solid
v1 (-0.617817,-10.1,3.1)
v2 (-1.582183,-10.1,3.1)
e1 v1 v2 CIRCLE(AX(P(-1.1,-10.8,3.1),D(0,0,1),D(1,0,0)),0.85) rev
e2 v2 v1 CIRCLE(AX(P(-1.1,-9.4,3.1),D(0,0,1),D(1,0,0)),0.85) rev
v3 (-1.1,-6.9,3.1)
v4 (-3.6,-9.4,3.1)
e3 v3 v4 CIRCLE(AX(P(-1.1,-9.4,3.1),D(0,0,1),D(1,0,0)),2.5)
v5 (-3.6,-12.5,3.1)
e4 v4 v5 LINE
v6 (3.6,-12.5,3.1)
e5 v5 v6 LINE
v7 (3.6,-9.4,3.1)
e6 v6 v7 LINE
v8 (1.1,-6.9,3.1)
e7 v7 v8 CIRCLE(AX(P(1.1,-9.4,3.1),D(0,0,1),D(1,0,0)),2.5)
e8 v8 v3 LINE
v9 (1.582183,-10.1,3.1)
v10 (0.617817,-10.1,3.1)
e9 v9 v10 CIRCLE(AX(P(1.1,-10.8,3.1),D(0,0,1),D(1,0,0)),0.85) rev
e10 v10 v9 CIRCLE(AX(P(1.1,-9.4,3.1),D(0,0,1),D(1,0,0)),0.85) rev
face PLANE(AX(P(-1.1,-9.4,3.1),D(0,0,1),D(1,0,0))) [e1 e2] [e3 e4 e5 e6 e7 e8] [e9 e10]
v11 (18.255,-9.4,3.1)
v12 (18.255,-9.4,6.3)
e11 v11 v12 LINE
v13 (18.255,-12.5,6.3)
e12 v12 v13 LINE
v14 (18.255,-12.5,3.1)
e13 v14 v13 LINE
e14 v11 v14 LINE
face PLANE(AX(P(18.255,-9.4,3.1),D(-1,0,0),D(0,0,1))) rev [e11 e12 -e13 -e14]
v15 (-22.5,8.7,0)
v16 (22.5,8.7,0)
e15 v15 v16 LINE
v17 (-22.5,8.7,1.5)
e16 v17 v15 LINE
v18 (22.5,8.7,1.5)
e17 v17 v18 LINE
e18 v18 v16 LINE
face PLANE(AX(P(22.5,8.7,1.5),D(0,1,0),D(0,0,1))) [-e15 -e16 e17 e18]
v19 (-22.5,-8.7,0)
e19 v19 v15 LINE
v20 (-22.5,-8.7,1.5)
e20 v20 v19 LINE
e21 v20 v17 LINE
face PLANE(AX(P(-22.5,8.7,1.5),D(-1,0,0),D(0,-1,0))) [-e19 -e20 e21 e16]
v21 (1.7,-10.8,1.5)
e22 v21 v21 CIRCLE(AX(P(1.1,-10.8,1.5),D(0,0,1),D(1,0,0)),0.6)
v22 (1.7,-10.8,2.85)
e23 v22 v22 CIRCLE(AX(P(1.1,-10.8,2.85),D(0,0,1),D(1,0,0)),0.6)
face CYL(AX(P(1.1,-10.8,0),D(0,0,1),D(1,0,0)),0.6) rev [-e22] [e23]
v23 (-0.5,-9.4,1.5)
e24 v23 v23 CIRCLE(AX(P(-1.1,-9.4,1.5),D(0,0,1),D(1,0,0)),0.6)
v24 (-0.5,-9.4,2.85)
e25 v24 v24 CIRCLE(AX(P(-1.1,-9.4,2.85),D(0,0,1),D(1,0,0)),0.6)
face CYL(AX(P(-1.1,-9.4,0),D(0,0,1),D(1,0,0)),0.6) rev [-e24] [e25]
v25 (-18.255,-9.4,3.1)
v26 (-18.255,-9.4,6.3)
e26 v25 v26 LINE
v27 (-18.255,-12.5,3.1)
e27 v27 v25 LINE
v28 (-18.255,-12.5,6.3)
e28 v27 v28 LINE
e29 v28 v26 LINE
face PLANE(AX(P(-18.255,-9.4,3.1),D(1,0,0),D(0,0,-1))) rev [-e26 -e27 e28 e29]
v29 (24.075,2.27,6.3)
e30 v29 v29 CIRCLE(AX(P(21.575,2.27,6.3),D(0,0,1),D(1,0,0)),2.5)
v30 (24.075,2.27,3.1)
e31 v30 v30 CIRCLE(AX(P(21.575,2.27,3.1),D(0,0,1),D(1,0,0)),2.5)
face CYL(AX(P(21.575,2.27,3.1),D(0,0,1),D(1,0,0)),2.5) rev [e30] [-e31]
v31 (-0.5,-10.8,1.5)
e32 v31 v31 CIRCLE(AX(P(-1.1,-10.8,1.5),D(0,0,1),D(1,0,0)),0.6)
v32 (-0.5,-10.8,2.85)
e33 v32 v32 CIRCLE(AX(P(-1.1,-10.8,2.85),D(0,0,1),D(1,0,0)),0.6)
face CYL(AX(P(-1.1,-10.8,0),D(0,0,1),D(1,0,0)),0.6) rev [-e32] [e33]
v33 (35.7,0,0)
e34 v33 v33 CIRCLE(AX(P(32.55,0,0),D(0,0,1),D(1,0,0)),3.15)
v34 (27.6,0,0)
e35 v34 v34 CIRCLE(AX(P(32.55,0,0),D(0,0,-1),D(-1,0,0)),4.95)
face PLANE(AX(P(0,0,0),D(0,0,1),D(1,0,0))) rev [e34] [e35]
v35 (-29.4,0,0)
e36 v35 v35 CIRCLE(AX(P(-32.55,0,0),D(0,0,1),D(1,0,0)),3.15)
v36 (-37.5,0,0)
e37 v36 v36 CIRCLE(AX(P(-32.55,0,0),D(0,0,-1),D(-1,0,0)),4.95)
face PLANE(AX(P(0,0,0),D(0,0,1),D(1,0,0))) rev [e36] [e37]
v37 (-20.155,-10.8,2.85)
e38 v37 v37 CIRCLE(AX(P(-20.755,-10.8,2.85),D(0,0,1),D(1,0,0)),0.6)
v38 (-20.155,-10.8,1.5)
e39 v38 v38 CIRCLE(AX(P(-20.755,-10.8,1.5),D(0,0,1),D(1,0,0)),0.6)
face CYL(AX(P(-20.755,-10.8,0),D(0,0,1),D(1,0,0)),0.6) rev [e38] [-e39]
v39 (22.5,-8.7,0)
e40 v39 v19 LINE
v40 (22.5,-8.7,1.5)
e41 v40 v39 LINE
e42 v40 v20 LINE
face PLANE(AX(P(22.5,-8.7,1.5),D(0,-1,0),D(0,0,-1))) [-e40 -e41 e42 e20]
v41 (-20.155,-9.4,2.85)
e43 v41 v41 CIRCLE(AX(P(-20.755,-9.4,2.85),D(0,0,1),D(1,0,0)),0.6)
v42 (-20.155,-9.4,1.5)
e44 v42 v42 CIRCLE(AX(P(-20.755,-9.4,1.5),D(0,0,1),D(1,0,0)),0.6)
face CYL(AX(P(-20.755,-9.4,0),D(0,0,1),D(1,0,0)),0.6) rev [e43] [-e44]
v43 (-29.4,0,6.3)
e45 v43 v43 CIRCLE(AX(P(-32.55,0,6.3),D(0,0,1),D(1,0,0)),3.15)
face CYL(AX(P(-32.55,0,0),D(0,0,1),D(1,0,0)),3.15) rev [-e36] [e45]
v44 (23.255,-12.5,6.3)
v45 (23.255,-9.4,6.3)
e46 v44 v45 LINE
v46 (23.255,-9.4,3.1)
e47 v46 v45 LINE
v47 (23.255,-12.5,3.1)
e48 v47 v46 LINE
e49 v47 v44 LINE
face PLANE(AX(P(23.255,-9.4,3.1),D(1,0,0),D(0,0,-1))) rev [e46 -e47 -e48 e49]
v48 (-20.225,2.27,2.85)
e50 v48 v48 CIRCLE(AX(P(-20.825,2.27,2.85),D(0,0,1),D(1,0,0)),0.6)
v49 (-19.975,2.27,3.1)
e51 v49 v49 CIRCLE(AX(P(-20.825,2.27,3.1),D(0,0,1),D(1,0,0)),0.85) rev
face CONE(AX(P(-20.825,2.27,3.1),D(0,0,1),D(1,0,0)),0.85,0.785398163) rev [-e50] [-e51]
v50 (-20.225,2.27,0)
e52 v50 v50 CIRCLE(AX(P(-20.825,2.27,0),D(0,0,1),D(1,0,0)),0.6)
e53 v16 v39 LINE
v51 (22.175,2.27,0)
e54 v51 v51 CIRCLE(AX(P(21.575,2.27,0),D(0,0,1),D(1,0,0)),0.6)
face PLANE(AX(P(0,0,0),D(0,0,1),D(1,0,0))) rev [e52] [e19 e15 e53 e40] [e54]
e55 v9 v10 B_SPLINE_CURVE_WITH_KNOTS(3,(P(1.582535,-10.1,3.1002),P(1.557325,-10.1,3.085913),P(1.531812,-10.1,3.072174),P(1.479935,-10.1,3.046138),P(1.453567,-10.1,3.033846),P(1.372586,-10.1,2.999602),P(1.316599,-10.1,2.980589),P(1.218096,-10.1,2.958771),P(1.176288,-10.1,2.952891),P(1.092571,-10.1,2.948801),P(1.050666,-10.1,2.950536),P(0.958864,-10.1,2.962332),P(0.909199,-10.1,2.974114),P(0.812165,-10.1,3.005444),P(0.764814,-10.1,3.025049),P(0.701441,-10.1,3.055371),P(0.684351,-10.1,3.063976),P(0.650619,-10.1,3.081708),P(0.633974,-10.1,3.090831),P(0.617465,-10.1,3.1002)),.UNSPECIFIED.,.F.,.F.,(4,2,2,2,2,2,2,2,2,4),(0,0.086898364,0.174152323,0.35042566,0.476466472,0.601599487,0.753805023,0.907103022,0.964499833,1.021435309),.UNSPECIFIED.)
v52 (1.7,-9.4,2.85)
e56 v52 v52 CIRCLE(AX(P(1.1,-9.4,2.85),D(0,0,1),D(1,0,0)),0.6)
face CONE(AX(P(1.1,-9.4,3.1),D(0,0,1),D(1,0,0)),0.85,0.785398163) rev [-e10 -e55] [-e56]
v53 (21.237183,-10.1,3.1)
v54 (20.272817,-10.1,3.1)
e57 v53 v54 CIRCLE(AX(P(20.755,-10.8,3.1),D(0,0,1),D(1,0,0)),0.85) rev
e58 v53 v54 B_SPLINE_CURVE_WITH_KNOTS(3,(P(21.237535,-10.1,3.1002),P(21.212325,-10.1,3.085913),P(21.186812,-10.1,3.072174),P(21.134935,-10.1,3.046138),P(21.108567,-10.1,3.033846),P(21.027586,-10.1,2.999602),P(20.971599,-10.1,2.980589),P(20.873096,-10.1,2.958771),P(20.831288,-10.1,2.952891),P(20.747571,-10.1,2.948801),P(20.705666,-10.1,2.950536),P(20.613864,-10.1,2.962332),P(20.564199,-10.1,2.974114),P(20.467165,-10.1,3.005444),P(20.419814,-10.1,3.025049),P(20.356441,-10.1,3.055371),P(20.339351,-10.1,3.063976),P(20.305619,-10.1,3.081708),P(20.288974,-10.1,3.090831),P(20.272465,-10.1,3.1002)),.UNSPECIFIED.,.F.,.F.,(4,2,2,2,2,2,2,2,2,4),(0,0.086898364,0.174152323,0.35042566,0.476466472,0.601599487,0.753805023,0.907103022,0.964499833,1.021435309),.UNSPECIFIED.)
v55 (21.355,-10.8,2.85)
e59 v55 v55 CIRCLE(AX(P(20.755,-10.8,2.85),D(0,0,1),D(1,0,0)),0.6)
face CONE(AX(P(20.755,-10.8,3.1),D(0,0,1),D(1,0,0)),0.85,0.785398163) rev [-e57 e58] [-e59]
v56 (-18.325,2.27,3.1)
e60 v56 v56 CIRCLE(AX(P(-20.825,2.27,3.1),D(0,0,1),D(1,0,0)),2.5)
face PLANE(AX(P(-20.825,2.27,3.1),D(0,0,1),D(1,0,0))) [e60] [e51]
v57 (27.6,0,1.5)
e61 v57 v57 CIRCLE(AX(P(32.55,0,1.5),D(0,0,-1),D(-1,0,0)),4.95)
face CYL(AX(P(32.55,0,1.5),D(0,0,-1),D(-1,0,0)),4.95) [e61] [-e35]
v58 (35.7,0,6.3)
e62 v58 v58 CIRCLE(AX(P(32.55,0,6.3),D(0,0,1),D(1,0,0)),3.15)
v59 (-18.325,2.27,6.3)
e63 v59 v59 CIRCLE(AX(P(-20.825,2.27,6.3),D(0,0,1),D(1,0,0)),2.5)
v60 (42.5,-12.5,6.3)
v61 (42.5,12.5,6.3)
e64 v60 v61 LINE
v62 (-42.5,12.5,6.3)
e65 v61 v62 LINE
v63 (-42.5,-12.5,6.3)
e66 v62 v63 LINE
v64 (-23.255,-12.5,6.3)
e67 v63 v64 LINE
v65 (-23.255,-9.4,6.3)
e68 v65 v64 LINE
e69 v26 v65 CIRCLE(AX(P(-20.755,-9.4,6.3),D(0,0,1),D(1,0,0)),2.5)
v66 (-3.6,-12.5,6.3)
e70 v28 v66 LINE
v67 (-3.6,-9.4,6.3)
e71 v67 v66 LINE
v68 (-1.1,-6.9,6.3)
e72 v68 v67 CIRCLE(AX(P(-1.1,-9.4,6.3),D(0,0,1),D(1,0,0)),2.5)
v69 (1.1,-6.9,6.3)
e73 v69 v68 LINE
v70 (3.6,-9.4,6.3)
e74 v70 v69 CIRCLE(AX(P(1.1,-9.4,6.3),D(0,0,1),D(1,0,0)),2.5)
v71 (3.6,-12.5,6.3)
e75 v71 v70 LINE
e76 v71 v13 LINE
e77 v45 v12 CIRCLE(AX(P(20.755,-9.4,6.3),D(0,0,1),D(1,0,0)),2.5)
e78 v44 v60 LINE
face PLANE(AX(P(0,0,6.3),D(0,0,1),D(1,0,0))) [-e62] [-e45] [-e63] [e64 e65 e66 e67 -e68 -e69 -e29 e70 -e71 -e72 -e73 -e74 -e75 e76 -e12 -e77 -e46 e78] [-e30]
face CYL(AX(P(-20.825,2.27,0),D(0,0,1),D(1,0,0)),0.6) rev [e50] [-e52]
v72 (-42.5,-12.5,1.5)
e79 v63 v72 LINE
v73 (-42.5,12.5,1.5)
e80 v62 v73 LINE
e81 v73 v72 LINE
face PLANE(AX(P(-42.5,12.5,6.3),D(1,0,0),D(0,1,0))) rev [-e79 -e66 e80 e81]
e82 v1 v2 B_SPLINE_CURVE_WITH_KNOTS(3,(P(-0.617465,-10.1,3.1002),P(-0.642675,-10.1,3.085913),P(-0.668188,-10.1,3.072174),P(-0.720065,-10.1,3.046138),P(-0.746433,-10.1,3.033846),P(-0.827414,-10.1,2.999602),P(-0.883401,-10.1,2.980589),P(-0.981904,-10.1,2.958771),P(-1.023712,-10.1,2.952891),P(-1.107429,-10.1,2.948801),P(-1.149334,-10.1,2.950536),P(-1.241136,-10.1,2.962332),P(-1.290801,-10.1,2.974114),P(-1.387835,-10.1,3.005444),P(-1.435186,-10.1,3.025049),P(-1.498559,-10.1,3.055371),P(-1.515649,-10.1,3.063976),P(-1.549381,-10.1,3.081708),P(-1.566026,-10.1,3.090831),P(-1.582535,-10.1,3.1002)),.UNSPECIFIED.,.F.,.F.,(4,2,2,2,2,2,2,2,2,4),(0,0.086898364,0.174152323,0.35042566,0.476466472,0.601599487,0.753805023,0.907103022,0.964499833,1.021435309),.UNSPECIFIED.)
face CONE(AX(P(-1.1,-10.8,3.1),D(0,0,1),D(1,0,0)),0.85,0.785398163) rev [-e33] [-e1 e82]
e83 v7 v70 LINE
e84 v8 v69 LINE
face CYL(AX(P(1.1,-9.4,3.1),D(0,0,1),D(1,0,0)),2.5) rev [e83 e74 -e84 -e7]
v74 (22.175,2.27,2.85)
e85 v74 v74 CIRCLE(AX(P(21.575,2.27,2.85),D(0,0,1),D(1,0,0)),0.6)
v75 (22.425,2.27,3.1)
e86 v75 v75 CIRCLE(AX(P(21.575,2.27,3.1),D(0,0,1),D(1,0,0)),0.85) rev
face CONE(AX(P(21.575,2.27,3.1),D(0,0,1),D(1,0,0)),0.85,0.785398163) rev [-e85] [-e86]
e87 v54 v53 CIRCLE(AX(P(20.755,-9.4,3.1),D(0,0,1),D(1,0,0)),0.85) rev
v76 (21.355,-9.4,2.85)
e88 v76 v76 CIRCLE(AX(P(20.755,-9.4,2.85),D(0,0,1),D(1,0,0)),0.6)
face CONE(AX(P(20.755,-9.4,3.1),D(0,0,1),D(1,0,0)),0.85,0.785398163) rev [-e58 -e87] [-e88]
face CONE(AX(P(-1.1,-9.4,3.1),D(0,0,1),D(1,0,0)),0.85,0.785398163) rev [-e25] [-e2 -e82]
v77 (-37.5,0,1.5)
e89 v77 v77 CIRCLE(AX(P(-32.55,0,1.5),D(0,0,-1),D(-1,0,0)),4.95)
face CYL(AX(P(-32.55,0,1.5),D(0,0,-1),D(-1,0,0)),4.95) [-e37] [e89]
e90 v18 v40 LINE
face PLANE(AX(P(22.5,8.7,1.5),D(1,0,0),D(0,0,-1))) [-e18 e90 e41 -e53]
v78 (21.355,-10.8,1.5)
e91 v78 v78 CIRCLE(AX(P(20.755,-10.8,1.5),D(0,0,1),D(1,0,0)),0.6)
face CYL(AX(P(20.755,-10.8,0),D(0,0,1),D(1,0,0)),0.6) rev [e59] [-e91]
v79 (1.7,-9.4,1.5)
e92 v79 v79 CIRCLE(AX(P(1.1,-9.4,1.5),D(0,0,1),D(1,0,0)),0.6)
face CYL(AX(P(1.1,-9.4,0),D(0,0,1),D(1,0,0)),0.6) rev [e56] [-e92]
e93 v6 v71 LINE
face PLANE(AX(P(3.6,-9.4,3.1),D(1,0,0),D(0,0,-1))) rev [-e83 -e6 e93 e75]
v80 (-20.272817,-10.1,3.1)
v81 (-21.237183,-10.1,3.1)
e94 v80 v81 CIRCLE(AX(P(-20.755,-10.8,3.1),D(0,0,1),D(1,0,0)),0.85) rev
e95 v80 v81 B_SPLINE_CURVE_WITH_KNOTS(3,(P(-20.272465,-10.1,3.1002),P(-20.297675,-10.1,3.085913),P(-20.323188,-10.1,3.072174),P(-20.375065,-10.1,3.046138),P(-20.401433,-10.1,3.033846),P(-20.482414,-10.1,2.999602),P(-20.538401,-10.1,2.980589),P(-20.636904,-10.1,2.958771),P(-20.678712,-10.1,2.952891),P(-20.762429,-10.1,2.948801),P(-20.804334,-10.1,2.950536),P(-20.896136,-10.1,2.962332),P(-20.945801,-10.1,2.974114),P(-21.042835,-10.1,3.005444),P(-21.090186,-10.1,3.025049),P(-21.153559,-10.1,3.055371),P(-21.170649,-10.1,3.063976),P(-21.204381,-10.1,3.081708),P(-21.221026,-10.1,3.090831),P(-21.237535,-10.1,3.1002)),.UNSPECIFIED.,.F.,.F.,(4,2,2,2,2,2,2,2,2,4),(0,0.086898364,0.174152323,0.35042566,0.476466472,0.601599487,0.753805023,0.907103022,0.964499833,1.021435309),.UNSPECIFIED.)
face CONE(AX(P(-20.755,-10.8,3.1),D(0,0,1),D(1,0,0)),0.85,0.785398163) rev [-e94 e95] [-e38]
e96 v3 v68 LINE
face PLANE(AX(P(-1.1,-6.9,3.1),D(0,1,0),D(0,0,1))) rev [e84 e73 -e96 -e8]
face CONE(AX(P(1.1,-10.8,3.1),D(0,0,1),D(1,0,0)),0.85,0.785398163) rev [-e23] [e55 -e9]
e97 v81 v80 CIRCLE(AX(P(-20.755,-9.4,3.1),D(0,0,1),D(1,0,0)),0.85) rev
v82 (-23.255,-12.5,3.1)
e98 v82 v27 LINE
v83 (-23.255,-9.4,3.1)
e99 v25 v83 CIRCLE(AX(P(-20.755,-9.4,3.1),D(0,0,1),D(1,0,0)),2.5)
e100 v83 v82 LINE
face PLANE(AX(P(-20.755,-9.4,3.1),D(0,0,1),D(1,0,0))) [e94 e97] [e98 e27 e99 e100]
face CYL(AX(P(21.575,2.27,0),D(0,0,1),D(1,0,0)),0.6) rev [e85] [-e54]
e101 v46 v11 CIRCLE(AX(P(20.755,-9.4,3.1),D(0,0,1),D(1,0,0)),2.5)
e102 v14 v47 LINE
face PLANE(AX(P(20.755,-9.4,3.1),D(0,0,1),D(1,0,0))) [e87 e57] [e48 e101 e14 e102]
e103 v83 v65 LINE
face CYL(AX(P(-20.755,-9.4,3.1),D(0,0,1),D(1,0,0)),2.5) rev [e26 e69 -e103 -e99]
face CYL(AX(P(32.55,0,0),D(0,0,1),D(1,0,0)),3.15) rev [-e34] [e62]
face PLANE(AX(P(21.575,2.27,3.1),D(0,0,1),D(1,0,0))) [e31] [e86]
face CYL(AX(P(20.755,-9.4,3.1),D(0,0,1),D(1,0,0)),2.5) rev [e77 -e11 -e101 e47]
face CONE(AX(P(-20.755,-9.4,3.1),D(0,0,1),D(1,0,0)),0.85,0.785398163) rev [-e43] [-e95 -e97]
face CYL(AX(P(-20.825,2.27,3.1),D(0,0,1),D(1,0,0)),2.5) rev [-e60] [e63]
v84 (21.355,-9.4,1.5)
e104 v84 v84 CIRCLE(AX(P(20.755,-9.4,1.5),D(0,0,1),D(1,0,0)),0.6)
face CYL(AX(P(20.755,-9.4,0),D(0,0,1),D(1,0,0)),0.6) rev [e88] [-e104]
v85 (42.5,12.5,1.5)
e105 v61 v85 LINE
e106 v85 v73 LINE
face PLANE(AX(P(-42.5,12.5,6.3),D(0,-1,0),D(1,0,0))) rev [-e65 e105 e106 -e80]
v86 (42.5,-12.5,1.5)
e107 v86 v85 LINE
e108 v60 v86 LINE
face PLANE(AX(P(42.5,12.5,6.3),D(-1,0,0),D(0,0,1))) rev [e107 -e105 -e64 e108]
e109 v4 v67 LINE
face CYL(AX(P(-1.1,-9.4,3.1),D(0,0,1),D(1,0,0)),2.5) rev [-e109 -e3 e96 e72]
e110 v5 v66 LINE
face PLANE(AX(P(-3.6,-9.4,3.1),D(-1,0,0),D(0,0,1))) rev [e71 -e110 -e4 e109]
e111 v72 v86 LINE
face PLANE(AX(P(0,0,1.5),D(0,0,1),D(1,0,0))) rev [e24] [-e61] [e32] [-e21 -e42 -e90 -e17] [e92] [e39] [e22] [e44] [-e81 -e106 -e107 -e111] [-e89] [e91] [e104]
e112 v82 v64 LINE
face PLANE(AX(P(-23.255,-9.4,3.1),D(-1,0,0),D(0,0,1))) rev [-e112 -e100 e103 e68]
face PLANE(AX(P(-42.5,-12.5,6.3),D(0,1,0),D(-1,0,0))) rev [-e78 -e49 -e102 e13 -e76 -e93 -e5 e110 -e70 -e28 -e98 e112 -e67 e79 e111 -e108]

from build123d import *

# Parameters (mm, degrees)
SKETCH1_W           = 85
SKETCH1_H           = 25
BOSS_EXTRUDE1_DEPTH = 6.3
SKETCH2_R           = 3.15
CUT_EXTRUDE1_DEPTH  = 45.745837795
SKETCH3_R           = 4.95
SKETCH3_W           = 45
SKETCH3_H           = 17.4
CUT_EXTRUDE3_DEPTH  = 1.5
SKETCH4_R           = 0.6
CUT_EXTRUDE4_DEPTH  = 45.745837795
SKETCH6_R           = 0.6
CUT_EXTRUDE5_DEPTH  = 45.745837795
SKETCH8_R           = 2.5
CUT_EXTRUDE6_DEPTH  = 3.2
CHAMFER1_SIZE       = 0.25


with BuildPart() as part:
    # Sketch1 → Boss-Extrude1 (new body)
    with BuildSketch(Plane.XY):
        Rectangle(SKETCH1_W, SKETCH1_H)
    extrude(amount=BOSS_EXTRUDE1_DEPTH)

    # Sketch2 → Cut-Extrude1 (cut, through all)
    with BuildSketch(Plane.XY.offset(6.3)):
        with Locations((32.55, 0)):
            Circle(SKETCH2_R)
        with Locations((-32.55, 0)):
            Circle(SKETCH2_R)
    extrude(amount=-CUT_EXTRUDE1_DEPTH, mode=Mode.SUBTRACT)

    # Sketch3 → Cut-Extrude3 (cut)
    with BuildSketch(Plane(origin=(0, 0, 0), x_dir=(-1, 0, 0), z_dir=(0, 0, -1))):
        Polygon((-45.439513652, -14.921110138), (-45.439513652, 15.191583433), (44.718251531, 15.191583433), (44.718251531, -15.912845555), align=None)
        with Locations((-32.55, 0)):
            Circle(SKETCH3_R, mode=Mode.SUBTRACT)
        with Locations((32.55, 0)):
            Circle(SKETCH3_R, mode=Mode.SUBTRACT)
        Rectangle(SKETCH3_W, SKETCH3_H, mode=Mode.SUBTRACT)
    extrude(amount=-CUT_EXTRUDE3_DEPTH, mode=Mode.SUBTRACT)

    # Sketch4 → Cut-Extrude4 (cut, through all)
    with BuildSketch(Plane.XY.offset(6.3)):
        with Locations((-1.1, -10.8)):
            Circle(SKETCH4_R)
        with Locations((1.1, -10.8)):
            Circle(SKETCH4_R)
        with Locations((-20.755, -10.8)):
            Circle(SKETCH4_R)
        with Locations((20.755, -10.8)):
            Circle(SKETCH4_R)
        with Locations((-1.1, -9.4)):
            Circle(SKETCH4_R)
        with Locations((1.1, -9.4)):
            Circle(SKETCH4_R)
        with Locations((20.755, -9.4)):
            Circle(SKETCH4_R)
        with Locations((-20.755, -9.4)):
            Circle(SKETCH4_R)
    extrude(amount=-CUT_EXTRUDE4_DEPTH, mode=Mode.SUBTRACT)

    # Sketch6 → Cut-Extrude5 (cut, through all)
    with BuildSketch(Plane.XY.offset(6.3)):
        with Locations((-20.825, 2.27)):
            Circle(SKETCH6_R)
        with Locations((21.575, 2.27)):
            Circle(SKETCH6_R)
    extrude(amount=-CUT_EXTRUDE5_DEPTH, mode=Mode.SUBTRACT)

    # Sketch8 → Cut-Extrude6 (cut)
    with BuildSketch(Plane.XY.offset(6.3)):
        with Locations((-20.825, 2.27)):
            Circle(SKETCH8_R)
        with Locations((21.575, 2.27)):
            Circle(SKETCH8_R)
        with BuildLine():
            Line((18.255, -12.5), (23.255, -12.5))
            Line((23.255, -12.5), (23.255, -9.4))
            ThreePointArc((23.255, -9.4), (20.755, -6.9), (18.255, -9.4))
            Line((18.255, -9.4), (18.255, -12.5))
        make_face()
        with BuildLine():
            Line((-1.1, -6.9), (1.1, -6.9))
            ThreePointArc((1.1, -6.9), (2.867766953, -7.632233047), (3.6, -9.4))
            Line((3.6, -9.4), (3.6, -12.5))
            Line((3.6, -12.5), (-3.6, -12.5))
            Line((-3.6, -12.5), (-3.6, -9.4))
            ThreePointArc((-3.6, -9.4), (-2.867766953, -7.632233047), (-1.1, -6.9))
        make_face()
        with BuildLine():
            Line((-23.255, -12.5), (-18.255, -12.5))
            Line((-18.255, -12.5), (-18.255, -9.4))
            ThreePointArc((-18.255, -9.4), (-20.755, -6.9), (-23.255, -9.4))
            Line((-23.255, -9.4), (-23.255, -12.5))
        make_face()
    extrude(amount=-CUT_EXTRUDE6_DEPTH, mode=Mode.SUBTRACT)

    # Chamfer1
    # the kernel refuses this chamfer: 0.25 mm, written as the material it takes off along each edge
    with BuildSketch(Plane(origin=(20.755, -9.4, 3.1), x_dir=(1, 0, 0), z_dir=(0, -1, 0))) as chamfer1_piece_1:
        Polygon((0.6, -CHAMFER1_SIZE), (0.6 + CHAMFER1_SIZE, 0), (0.6, 0), align=None)
    revolve(axis=Axis((20.755, -9.4, 3.1), (0, 0, 1)), mode=Mode.SUBTRACT)
    with BuildSketch(Plane(origin=(20.755, -10.8, 3.1), x_dir=(1, 0, 0), z_dir=(0, -1, 0))) as chamfer1_piece_2:
        Polygon((0.6, -CHAMFER1_SIZE), (0.6 + CHAMFER1_SIZE, 0), (0.6, 0), align=None)
    revolve(axis=Axis((20.755, -10.8, 3.1), (0, 0, 1)), mode=Mode.SUBTRACT)
    with BuildSketch(Plane(origin=(-20.825, 2.27, 3.1), x_dir=(1, 0, 0), z_dir=(0, -1, 0))) as chamfer1_piece_3:
        Polygon((0.6 + CHAMFER1_SIZE, 0), (0.6, -CHAMFER1_SIZE), (0.6, 0), align=None)
    revolve(axis=Axis((-20.825, 2.27, 3.1), (0, 0, 1)), mode=Mode.SUBTRACT)
    with BuildSketch(Plane(origin=(-20.755, -9.4, 3.1), x_dir=(1, 0, 0), z_dir=(0, -1, 0))) as chamfer1_piece_4:
        Polygon((0.6, -CHAMFER1_SIZE), (0.6 + CHAMFER1_SIZE, 0), (0.6, 0), align=None)
    revolve(axis=Axis((-20.755, -9.4, 3.1), (0, 0, 1)), mode=Mode.SUBTRACT)
    with BuildSketch(Plane(origin=(-20.755, -10.8, 3.1), x_dir=(1, 0, 0), z_dir=(0, -1, 0))) as chamfer1_piece_5:
        Polygon((0.6, -CHAMFER1_SIZE), (0.6 + CHAMFER1_SIZE, 0), (0.6, 0), align=None)
    revolve(axis=Axis((-20.755, -10.8, 3.1), (0, 0, 1)), mode=Mode.SUBTRACT)
    with BuildSketch(Plane(origin=(21.575, 2.27, 3.1), x_dir=(1, 0, 0), z_dir=(0, -1, 0))) as chamfer1_piece_6:
        Polygon((0.6 + CHAMFER1_SIZE, 0), (0.6, -CHAMFER1_SIZE), (0.6, 0), align=None)
    revolve(axis=Axis((21.575, 2.27, 3.1), (0, 0, 1)), mode=Mode.SUBTRACT)
    with BuildSketch(Plane(origin=(-1.1, -10.8, 3.1), x_dir=(1, 0, 0), z_dir=(0, -1, 0))) as chamfer1_piece_7:
        Polygon((0.6, -CHAMFER1_SIZE), (0.6 + CHAMFER1_SIZE, 0), (0.6, 0), align=None)
    revolve(axis=Axis((-1.1, -10.8, 3.1), (0, 0, 1)), mode=Mode.SUBTRACT)
    with BuildSketch(Plane(origin=(1.1, -9.4, 3.1), x_dir=(1, 0, 0), z_dir=(0, -1, 0))) as chamfer1_piece_8:
        Polygon((0.6, -CHAMFER1_SIZE), (0.6 + CHAMFER1_SIZE, 0), (0.6, 0), align=None)
    revolve(axis=Axis((1.1, -9.4, 3.1), (0, 0, 1)), mode=Mode.SUBTRACT)
    with BuildSketch(Plane(origin=(1.1, -10.8, 3.1), x_dir=(1, 0, 0), z_dir=(0, -1, 0))) as chamfer1_piece_9:
        Polygon((0.6, -CHAMFER1_SIZE), (0.6 + CHAMFER1_SIZE, 0), (0.6, 0), align=None)
    revolve(axis=Axis((1.1, -10.8, 3.1), (0, 0, 1)), mode=Mode.SUBTRACT)
    with BuildSketch(Plane(origin=(-1.1, -9.4, 3.1), x_dir=(1, 0, 0), z_dir=(0, -1, 0))) as chamfer1_piece_10:
        Polygon((0.6, -CHAMFER1_SIZE), (0.6 + CHAMFER1_SIZE, 0), (0.6, 0), align=None)
    revolve(axis=Axis((-1.1, -9.4, 3.1), (0, 0, 1)), mode=Mode.SUBTRACT)


solid = part.part
